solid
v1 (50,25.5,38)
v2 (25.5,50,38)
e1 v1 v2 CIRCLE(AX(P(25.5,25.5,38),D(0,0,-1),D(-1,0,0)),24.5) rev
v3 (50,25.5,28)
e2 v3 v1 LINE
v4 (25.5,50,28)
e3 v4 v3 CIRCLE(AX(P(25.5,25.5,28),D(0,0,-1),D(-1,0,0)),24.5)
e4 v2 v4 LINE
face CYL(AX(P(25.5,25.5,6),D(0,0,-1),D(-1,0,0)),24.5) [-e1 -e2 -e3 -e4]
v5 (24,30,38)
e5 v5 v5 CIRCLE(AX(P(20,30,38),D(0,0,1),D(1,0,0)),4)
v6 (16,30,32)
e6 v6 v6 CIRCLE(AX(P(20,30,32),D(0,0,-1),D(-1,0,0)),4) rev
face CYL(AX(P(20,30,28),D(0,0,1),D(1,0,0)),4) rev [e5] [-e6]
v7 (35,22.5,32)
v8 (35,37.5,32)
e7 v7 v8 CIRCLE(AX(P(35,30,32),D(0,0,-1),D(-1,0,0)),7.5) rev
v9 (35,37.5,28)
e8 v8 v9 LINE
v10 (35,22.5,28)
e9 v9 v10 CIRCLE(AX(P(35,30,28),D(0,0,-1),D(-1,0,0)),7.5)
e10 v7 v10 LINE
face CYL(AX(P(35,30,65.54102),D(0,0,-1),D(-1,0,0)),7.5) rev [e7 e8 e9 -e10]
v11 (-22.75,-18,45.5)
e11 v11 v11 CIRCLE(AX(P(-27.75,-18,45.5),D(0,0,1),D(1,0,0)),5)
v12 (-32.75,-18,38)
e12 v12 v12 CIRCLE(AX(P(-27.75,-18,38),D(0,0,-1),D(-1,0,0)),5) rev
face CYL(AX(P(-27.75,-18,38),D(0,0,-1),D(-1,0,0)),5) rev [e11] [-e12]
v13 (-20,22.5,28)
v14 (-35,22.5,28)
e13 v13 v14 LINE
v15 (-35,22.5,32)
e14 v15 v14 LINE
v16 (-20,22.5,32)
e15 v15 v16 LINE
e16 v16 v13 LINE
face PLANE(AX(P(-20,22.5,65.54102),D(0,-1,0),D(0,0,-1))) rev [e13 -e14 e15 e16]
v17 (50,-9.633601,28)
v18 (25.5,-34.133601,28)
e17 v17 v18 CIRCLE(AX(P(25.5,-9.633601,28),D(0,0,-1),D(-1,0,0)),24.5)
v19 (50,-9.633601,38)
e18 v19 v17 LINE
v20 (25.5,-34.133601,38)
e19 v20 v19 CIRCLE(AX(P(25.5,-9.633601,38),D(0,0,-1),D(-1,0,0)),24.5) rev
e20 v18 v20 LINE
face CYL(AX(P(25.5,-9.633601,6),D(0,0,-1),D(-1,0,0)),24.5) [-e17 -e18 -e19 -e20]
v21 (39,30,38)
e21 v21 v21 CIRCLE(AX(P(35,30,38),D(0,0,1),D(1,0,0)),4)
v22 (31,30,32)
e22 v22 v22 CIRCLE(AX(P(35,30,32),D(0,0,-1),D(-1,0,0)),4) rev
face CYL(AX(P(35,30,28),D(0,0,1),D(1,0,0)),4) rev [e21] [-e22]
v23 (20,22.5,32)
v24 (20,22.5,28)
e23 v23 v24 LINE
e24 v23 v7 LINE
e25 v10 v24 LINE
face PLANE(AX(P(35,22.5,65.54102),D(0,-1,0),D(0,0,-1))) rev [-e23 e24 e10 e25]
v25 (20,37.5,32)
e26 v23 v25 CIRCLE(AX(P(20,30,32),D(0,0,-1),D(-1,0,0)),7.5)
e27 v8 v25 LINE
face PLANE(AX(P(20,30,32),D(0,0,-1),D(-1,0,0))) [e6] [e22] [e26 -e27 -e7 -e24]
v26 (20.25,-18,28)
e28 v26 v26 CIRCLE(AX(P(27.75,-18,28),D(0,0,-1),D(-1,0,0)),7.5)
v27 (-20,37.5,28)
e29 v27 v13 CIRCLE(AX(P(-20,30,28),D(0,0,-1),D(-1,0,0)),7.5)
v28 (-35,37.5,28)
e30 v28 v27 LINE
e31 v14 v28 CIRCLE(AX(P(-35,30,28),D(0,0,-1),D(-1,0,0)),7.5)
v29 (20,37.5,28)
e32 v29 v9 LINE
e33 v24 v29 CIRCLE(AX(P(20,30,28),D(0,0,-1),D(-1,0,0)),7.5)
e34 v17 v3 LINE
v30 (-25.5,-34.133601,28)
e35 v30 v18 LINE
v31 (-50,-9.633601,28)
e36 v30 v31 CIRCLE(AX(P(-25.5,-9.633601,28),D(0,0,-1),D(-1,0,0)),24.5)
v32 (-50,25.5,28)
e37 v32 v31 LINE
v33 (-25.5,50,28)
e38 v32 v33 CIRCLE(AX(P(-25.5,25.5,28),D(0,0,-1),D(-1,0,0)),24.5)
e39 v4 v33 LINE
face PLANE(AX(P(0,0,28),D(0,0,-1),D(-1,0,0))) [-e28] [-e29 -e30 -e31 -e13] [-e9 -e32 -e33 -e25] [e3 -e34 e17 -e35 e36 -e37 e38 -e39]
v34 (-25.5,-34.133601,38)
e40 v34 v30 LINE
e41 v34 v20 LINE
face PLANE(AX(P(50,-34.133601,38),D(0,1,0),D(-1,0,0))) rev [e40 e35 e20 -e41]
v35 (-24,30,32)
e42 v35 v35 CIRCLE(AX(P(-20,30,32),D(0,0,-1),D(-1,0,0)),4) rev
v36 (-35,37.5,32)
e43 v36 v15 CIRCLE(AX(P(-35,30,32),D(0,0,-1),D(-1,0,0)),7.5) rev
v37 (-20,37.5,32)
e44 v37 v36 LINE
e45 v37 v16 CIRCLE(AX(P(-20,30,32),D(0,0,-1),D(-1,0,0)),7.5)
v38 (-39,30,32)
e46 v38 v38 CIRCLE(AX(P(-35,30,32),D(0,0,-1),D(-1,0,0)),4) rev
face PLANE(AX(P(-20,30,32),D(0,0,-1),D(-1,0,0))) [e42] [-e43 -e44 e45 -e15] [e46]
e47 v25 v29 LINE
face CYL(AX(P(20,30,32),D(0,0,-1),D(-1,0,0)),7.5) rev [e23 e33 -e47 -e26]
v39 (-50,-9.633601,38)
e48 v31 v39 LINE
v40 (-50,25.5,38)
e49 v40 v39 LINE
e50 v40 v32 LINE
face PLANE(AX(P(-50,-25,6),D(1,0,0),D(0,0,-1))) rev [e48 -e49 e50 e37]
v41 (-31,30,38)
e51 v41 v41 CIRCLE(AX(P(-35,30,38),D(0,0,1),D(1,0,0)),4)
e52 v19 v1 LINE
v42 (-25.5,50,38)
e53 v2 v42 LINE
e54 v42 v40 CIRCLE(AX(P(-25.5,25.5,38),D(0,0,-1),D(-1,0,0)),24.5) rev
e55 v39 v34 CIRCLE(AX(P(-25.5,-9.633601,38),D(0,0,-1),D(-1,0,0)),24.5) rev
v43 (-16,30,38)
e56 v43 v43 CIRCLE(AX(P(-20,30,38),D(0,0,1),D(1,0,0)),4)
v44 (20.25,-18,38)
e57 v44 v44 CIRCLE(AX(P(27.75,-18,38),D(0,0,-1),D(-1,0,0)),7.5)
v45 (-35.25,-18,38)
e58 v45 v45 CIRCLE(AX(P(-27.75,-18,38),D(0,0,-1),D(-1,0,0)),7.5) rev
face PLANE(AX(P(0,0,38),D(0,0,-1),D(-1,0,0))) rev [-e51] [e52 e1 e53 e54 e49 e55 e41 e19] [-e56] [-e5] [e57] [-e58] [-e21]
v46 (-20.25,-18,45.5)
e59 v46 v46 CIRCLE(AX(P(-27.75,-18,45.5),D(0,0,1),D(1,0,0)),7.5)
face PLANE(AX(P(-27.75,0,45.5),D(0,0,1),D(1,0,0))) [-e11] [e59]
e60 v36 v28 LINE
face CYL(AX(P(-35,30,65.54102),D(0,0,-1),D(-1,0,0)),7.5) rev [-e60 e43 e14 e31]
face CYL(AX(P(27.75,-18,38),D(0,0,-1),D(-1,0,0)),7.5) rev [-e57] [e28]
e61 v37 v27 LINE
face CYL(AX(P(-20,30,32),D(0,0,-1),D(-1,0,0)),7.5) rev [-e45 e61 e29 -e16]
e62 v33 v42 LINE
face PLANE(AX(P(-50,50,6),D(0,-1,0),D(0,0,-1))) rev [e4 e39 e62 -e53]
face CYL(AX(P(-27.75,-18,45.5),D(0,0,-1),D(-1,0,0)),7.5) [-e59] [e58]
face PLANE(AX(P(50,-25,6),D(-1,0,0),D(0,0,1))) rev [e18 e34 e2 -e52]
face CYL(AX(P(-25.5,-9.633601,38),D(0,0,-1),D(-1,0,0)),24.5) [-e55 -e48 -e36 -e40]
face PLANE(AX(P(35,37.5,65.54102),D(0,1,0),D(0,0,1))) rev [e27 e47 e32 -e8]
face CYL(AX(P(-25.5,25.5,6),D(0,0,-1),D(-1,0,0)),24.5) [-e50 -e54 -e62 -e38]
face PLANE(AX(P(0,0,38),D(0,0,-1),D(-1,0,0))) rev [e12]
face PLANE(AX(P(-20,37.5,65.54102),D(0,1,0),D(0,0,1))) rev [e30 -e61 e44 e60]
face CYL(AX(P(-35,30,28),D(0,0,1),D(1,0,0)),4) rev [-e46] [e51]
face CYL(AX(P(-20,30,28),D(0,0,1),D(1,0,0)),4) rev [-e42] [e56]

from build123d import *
from build123d.topology import SkipClean

# Parameters (mm, degrees)
SKETCH1_W                = 100
SKETCH1_H                = 50
BOSS_EXTRUDE1_DEPTH      = 6
SKETCH2_R                = 5
CUT_EXTRUDE1_DEPTH       = 57.222771187
MOVE_FACE2_BY            = 15
SKETCH3_W                = 100
SKETCH3_H                = 12
BOSS_EXTRUDE2_DEPTH      = 22
SKETCH4_R                = 2.5
BOSS_EXTRUDE3_DEPTH      = 20
SKETCH5_W                = 100
SKETCH5_H                = 56.133601368
BOSS_EXTRUDE4_DEPTH      = 10
SKETCH6_R                = 5
SKETCH6_R_2              = 2.5
CUT_EXTRUDE2_DEPTH       = 75.458041876
FILLET2_R                = 24.5
FILLET3_R                = 5
CUT_EXTRUDE3_DEPTH       = 48
MOVE_FACE3_BY            = 2.5
SKETCH10_R               = 4
CUT_EXTRUDE5_DEPTH       = 65.807406984
SKETCH13_R               = 7.5
SKETCH13_R_2             = 5
BOSS_EXTRUDE8_DEPTH      = 7.5
SKETCH14_R               = 5
BOSS_EXTRUDE9_DEPTH      = 10
SKETCH15_R               = 7.5
CUT_EXTRUDE6_DEPTH       = 4
MOVE_START               = 38
MOVE_FACE4_OUTLINE_R     = 7.5
MOVE_FACE4_OUTLINE_R_2   = 5
MOVE_FACE4_DEPTH         = 7.5
MOVE_START_2             = 28
MOVE_FACE4_2_DEPTH       = 10
MOVE_FACE4_3_OUTLINE_R   = 2.5
MOVE_FACE4_3_OUTLINE_R_2 = 7.5
MOVE_FACE4_3_DEPTH       = 10
MOVE_FACE4_4_OUTLINE_R   = 7.5
MOVE_FACE4_4_OUTLINE_R_2 = 5
MOVE_FACE4_4_DEPTH       = 7.5
MOVE_FACE5_DEPTH         = 10
CUT_EXTRUDE7_DEPTH       = 4
SKETCH17_W               = 33.141989336
SKETCH17_H               = 9.244353108
BOSS_EXTRUDE10_DEPTH     = 10


# Read off the part's stored shape, not the designer's step: Move Face4, Move Face5
with BuildPart() as part:
    # Sketch1 → Boss-Extrude1 (new body)
    with BuildSketch(Plane.XY):
        Rectangle(SKETCH1_W, SKETCH1_H)
    extrude(amount=BOSS_EXTRUDE1_DEPTH)

    # Sketch2 → Cut-Extrude1 (cut, through all)
    with BuildSketch(Plane.XY.offset(6)):
        with Locations((27.75, 0)):
            Circle(SKETCH2_R)
        with Locations((-27.75, 0)):
            Circle(SKETCH2_R)
    extrude(amount=-CUT_EXTRUDE1_DEPTH, mode=Mode.SUBTRACT)

    # Move Face2: a face moved outward by 15.0
    extrude(part.faces().sort_by_distance((0, 25, 3))[0], amount=MOVE_FACE2_BY, dir=(0, 1, 0))

    # Sketch3 → Boss-Extrude2 (add)
    with BuildSketch(Plane.XY.offset(6)):
        with Locations((0, 34)):
            Rectangle(SKETCH3_W, SKETCH3_H)
    extrude(amount=BOSS_EXTRUDE2_DEPTH)

    # Sketch4 → Boss-Extrude3 (add)
    with BuildSketch(Plane(origin=(0, 0, 0), x_dir=(-1, 0, 0), z_dir=(0, 0, -1))):
        with Locations((9.999238357, -9.892069005)):
            Circle(SKETCH4_R)
        with Locations((-10.000761643, -9.892069005)):
            Circle(SKETCH4_R)
    extrude(amount=BOSS_EXTRUDE3_DEPTH)

    # Sketch5 → Boss-Extrude4 (add)
    with BuildSketch(Plane.XY.offset(28)):
        with Locations((0, 11.933199316)):
            Rectangle(SKETCH5_W, SKETCH5_H)
    extrude(amount=BOSS_EXTRUDE4_DEPTH)

    # Sketch6 → Cut-Extrude2 (cut, through all)
    with BuildSketch(Plane(origin=(0, 0, 0), x_dir=(-1, 0, 0), z_dir=(0, 0, -1))):
        with Locations(Location((27.75, 0, 0), (0, 0, 180))):
            Circle(SKETCH6_R)
        with Locations((9.999238357, -9.892069005)):
            Circle(SKETCH6_R_2)
        with Locations((-10.000761643, -9.892069005)):
            Circle(SKETCH6_R_2)
        with Locations(Location((-27.75, 0, 0), (0, 0, 180))):
            Circle(SKETCH6_R)
    extrude(amount=-CUT_EXTRUDE2_DEPTH, mode=Mode.SUBTRACT)


with BuildPart() as cut_extrude2_piece_1:
    # of the separate pieces the step leaves, piece 1, a body of its own (cut_extrude2_pieces)
    add(part.part.solids().sort_by_distance((50, 40, 0))[0])

    # Fillet2
    # the kernel refuses this fillet: 24.5 mm, written as the material it takes off along each edge
    with BuildSketch(Plane(origin=(50, -16.133601368, -33.25), x_dir=(0, 1, 0), z_dir=(0, 0, 1))) as fillet2_piece_1_section:
        with BuildLine():
            CenterArc((FILLET2_R, FILLET2_R), FILLET2_R, 180, 90)
            Line((0, FILLET2_R), (0, 0))
            Line((0, 0), (FILLET2_R, 0))
        make_face()
    fillet2_piece_1 = extrude(amount=132.5, mode=Mode.PRIVATE)
    fillet2_piece_1 = split(fillet2_piece_1, bisect_by=Plane(origin=(44.527485496, -10.661086864, 6), z_dir=(0, 0, 1)), keep=Keep.TOP, mode=Mode.PRIVATE)
    add(fillet2_piece_1, mode=Mode.SUBTRACT)
    with BuildSketch(Plane(origin=(-50, 40, -61.25), x_dir=(1, 0, 0), z_dir=(0, 0, 1)), Plane(origin=(50, 40, -61.25), x_dir=(0, -1, 0), z_dir=(0, 0, 1))) as fillet2_piece_2:
        with BuildLine():
            CenterArc((FILLET2_R, -FILLET2_R), FILLET2_R, 90, 90)
            Line((0, -FILLET2_R), (0, 0))
            Line((0, 0), (FILLET2_R, 0))
        make_face()
    extrude(amount=160.5, mode=Mode.SUBTRACT)
    with BuildSketch(Plane(origin=(-50, -16.133601368, -33.25), x_dir=(1, 0, 0), z_dir=(0, 0, 1))) as fillet2_piece_3_section:
        with BuildLine():
            CenterArc((FILLET2_R, FILLET2_R), FILLET2_R, 180, 90)
            Line((0, FILLET2_R), (0, 0))
            Line((0, 0), (FILLET2_R, 0))
        make_face()
    fillet2_piece_3 = extrude(amount=132.5, mode=Mode.PRIVATE)
    fillet2_piece_3 = split(fillet2_piece_3, bisect_by=Plane(origin=(-44.527485496, -10.661086864, 6), z_dir=(0, 0, 1)), keep=Keep.TOP, mode=Mode.PRIVATE)
    add(fillet2_piece_3, mode=Mode.SUBTRACT)
    with BuildSketch(Plane(origin=(50, -25, -61.25), x_dir=(0, 1, 0), z_dir=(0, 0, 1)), Plane(origin=(-50, -25, -61.25), x_dir=(1, 0, 0), z_dir=(0, 0, 1))) as fillet2_piece_4:
        with BuildLine():
            CenterArc((FILLET2_R, FILLET2_R), FILLET2_R, 180, 90)
            Line((0, FILLET2_R), (0, 0))
            Line((0, 0), (FILLET2_R, 0))
        make_face()
    extrude(amount=128.5, mode=Mode.SUBTRACT)

    # Fillet3
    fillet3_edges = [cut_extrude2_piece_1.edges().sort_by_distance(p)[0] for p in [
        (46.571307506, 28, 17),
        (-46.571307506, 28, 17),
    ]]
    fillet(fillet3_edges, radius=FILLET3_R)


with BuildPart() as cut_extrude2_piece_2:
    # of the separate pieces the step leaves, piece 2, a body of its own (cut_extrude2_pieces)
    add(part.part.solids().sort_by_distance((-12.499238357, -9.892069005, -20))[0])


with BuildPart() as cut_extrude2_piece_3:
    # of the separate pieces the step leaves, piece 3, a body of its own (cut_extrude2_pieces)
    add(part.part.solids().sort_by_distance((7.500761643, -9.892069005, -20))[0])


with BuildPart() as cut_extrude3_tool:
    # Sketch8 → Cut-Extrude3 (new body)
    with BuildSketch(Plane(origin=(0, 0, -20), x_dir=(-1, 0, 0), z_dir=(0, 0, -1))):
        with BuildLine():
            Line((-50, 15.5), (-50, -0.5))
            ThreePointArc((-50, -0.5), (-42.824116139, -17.824116139), (-25.5, -25))
            Line((-25.5, -25), (25.5, -25))
            ThreePointArc((25.5, -25), (42.824116139, -17.824116139), (50, -0.5))
            Line((50, -0.5), (50, 15.5))
            ThreePointArc((50, 15.5), (42.824116139, 32.824116139), (25.5, 40))
            Line((25.5, 40), (-25.5, 40))
            ThreePointArc((-25.5, 40), (-42.824116139, 32.824116139), (-50, 15.5))
        make_face()
    extrude(amount=-CUT_EXTRUDE3_DEPTH)


with BuildPart() as cut_extrude2_piece_1_1:
    add(cut_extrude2_piece_1.part)

    # Cut-Extrude3: cut by cut_extrude3_tool
    add(cut_extrude3_tool.part, mode=Mode.SUBTRACT)

    # Move Face3: a curved face moved inward by 2.5
    add(Solid.thicken(cut_extrude2_piece_1_1.faces().sort_by_distance((22.75, 0, 33))[0], -MOVE_FACE3_BY), mode=Mode.SUBTRACT)

    # Sketch10 → Cut-Extrude5 (cut, through all)
    with BuildSketch(Plane.XY.offset(38)):
        with Locations((-35, 30)):
            Circle(SKETCH10_R)
        with Locations((35, 30)):
            Circle(SKETCH10_R)
        with Locations((-20, 30)):
            Circle(SKETCH10_R)
        with Locations((20, 30)):
            Circle(SKETCH10_R)
    extrude(amount=-CUT_EXTRUDE5_DEPTH, mode=Mode.SUBTRACT)

    # Sketch13 → Boss-Extrude8 (add)
    with SkipClean():  # the faces are left unmerged after this step: merging them gives an invalid solid
        with BuildSketch(Plane.XY.offset(38)):
            with Locations(Location((-27.75, 0, 0), (0, 0, 180))):
                Circle(SKETCH13_R)
            with Locations(Location((-27.75, 0, 0), (0, 0, 180))):
                Circle(SKETCH13_R_2, mode=Mode.SUBTRACT)
        extrude(amount=BOSS_EXTRUDE8_DEPTH)
    add(cut_extrude2_piece_1_1.part.scale(1), mode=Mode.REPLACE)  # the faces are merged on a copy

    # Sketch14 → Boss-Extrude9 (add)
    with BuildSketch(Plane(origin=(0, 0, 28), x_dir=(-1, 0, 0), z_dir=(0, 0, -1))):
        with Locations((27.75, 0)):
            Circle(SKETCH14_R)
    extrude(amount=-BOSS_EXTRUDE9_DEPTH)

    # Sketch15 → Cut-Extrude6 (cut)
    with BuildSketch(Plane(origin=(0, 0, 28), x_dir=(-1, 0, 0), z_dir=(0, 0, -1))):
        with Locations((-20, 30)):
            Circle(SKETCH15_R)
        with Locations((20, 30)):
            Circle(SKETCH15_R)
    extrude(amount=-CUT_EXTRUDE6_DEPTH, mode=Mode.SUBTRACT)

    # Move Face4 outline → Move Face4 (cut)
    with BuildSketch(Plane.XY.offset(MOVE_START)):
        with Locations((-27.75, 0)):
            Circle(MOVE_FACE4_OUTLINE_R)
        with Locations((-27.75, 0)):
            Circle(MOVE_FACE4_OUTLINE_R_2, mode=Mode.SUBTRACT)
    extrude(amount=MOVE_FACE4_DEPTH, mode=Mode.SUBTRACT)

    # Move Face4 2 outline → Move Face4 2 (cut)
    with BuildSketch(Plane.XY.offset(MOVE_START_2)):
        with BuildLine():
            ThreePointArc((34.368487141, -14.472163841), (26.858773605, -10.55314056), (20.485940794, -16.133601368))
            Line((20.485940794, -16.133601368), (25.5, -16.133601368))
            ThreePointArc((25.5, -16.133601368), (30.011386672, -15.714660113), (34.368487141, -14.472163841))
        make_face()
    extrude(amount=MOVE_FACE4_2_DEPTH, mode=Mode.SUBTRACT)

    # Move Face4 3 outline → Move Face4 3 (add)
    # profile 1 of 4: a face of its own
    with BuildSketch(Plane.XY.offset(MOVE_START_2)):
        with BuildLine():
            ThreePointArc((-25.5, -16.133601368), (-42.824116139, -8.957717507), (-50, 8.366398632))
            Line((-50, 8.366398632), (-50, -9.633601368))
            ThreePointArc((-50, -9.633601368), (-42.824116139, -26.957717507), (-25.5, -34.133601368))
            Line((-25.5, -34.133601368), (25.5, -34.133601368))
            ThreePointArc((25.5, -34.133601368), (42.824116139, -26.957717507), (50, -9.633601368))
            Line((50, -9.633601368), (50, 8.366398632))
            ThreePointArc((50, 8.366398632), (45.717912045, -5.471449196), (34.368487141, -14.472163841))
            ThreePointArc((34.368487141, -14.472163841), (28.641226395, -25.44685944), (20.485940794, -16.133601368))
            Line((20.485940794, -16.133601368), (-25.5, -16.133601368))
        make_face()
        with Locations((-9.999238357, -27.892069005)):
            Circle(MOVE_FACE4_3_OUTLINE_R, mode=Mode.SUBTRACT)
        with Locations((10.000761643, -27.892069005)):
            Circle(MOVE_FACE4_3_OUTLINE_R, mode=Mode.SUBTRACT)
    # profile 2 of 4: a face of its own
    with BuildSketch(Plane.XY.offset(MOVE_START_2)):
        with Locations((27.75, 0)):
            Circle(MOVE_FACE4_3_OUTLINE_R_2)
    # profile 3 of 4: a face of its own
    with BuildSketch(Plane.XY.offset(MOVE_START_2)):
        with Locations((10.000761643, -9.892069005)):
            Circle(MOVE_FACE4_3_OUTLINE_R)
    # profile 4 of 4: a face of its own
    with BuildSketch(Plane.XY.offset(MOVE_START_2)):
        with Locations((-9.999238357, -9.892069005)):
            Circle(MOVE_FACE4_3_OUTLINE_R)
    extrude(amount=MOVE_FACE4_3_DEPTH)

    # Move Face4 4 outline → Move Face4 4 (add)
    with BuildSketch(Plane.XY.offset(MOVE_START)):
        with Locations((-27.75, -18)):
            Circle(MOVE_FACE4_4_OUTLINE_R)
        with Locations((-27.75, -18)):
            Circle(MOVE_FACE4_4_OUTLINE_R_2, mode=Mode.SUBTRACT)
    extrude(amount=MOVE_FACE4_4_DEPTH)

    # Move Face5 outline → Move Face5 (add)
    with BuildSketch(Plane.XY.offset(MOVE_START_2)):
        with BuildLine():
            Line((25.5, 50), (-25.5, 50))
            ThreePointArc((-25.5, 50), (-42.824116139, 42.824116139), (-50, 25.5))
            Line((-50, 25.5), (-50, 15.5))
            ThreePointArc((-50, 15.5), (-42.824116139, 32.824116139), (-25.5, 40))
            Line((-25.5, 40), (25.5, 40))
            ThreePointArc((25.5, 40), (42.824116139, 32.824116139), (50, 15.5))
            Line((50, 15.5), (50, 25.5))
            ThreePointArc((50, 25.5), (42.824116139, 42.824116139), (25.5, 50))
        make_face()
    extrude(amount=MOVE_FACE5_DEPTH)

    # Sketch16 → Cut-Extrude7 (cut)
    with BuildSketch(Plane(origin=(0, 0, 28), x_dir=(-1, 0, 0), z_dir=(0, 0, -1))):
        with BuildLine():
            Line((-35, 37.5), (-20, 37.5))
            ThreePointArc((-20, 37.5), (-12.5, 30), (-20, 22.5))
            Line((-20, 22.5), (-35, 22.5))
            ThreePointArc((-35, 22.5), (-42.5, 30), (-35, 37.5))
        make_face()
        with BuildLine():
            Line((20, 37.5), (35, 37.5))
            ThreePointArc((35, 37.5), (42.5, 30), (35, 22.5))
            Line((35, 22.5), (20, 22.5))
            ThreePointArc((20, 22.5), (12.5, 30), (20, 37.5))
        make_face()
    extrude(amount=-CUT_EXTRUDE7_DEPTH, mode=Mode.SUBTRACT)

    # Sketch17 → Boss-Extrude10 (add)
    with BuildSketch(Plane(origin=(0, 0, 28), x_dir=(-1, 0, 0), z_dir=(0, 0, -1))):
        with Locations((-0.344204637, -27.66739457)):
            Rectangle(SKETCH17_W, SKETCH17_H)
    extrude(amount=-BOSS_EXTRUDE10_DEPTH)


with BuildPart() as cut_extrude2_piece_2_1:
    add(cut_extrude2_piece_2.part)

    # Cut-Extrude3: cut by cut_extrude3_tool
    add(cut_extrude3_tool.part, mode=Mode.SUBTRACT)


with BuildPart() as cut_extrude2_piece_3_1:
    add(cut_extrude2_piece_3.part)

    # Cut-Extrude3: cut by cut_extrude3_tool
    add(cut_extrude3_tool.part, mode=Mode.SUBTRACT)


solid = cut_extrude2_piece_1_1.part
